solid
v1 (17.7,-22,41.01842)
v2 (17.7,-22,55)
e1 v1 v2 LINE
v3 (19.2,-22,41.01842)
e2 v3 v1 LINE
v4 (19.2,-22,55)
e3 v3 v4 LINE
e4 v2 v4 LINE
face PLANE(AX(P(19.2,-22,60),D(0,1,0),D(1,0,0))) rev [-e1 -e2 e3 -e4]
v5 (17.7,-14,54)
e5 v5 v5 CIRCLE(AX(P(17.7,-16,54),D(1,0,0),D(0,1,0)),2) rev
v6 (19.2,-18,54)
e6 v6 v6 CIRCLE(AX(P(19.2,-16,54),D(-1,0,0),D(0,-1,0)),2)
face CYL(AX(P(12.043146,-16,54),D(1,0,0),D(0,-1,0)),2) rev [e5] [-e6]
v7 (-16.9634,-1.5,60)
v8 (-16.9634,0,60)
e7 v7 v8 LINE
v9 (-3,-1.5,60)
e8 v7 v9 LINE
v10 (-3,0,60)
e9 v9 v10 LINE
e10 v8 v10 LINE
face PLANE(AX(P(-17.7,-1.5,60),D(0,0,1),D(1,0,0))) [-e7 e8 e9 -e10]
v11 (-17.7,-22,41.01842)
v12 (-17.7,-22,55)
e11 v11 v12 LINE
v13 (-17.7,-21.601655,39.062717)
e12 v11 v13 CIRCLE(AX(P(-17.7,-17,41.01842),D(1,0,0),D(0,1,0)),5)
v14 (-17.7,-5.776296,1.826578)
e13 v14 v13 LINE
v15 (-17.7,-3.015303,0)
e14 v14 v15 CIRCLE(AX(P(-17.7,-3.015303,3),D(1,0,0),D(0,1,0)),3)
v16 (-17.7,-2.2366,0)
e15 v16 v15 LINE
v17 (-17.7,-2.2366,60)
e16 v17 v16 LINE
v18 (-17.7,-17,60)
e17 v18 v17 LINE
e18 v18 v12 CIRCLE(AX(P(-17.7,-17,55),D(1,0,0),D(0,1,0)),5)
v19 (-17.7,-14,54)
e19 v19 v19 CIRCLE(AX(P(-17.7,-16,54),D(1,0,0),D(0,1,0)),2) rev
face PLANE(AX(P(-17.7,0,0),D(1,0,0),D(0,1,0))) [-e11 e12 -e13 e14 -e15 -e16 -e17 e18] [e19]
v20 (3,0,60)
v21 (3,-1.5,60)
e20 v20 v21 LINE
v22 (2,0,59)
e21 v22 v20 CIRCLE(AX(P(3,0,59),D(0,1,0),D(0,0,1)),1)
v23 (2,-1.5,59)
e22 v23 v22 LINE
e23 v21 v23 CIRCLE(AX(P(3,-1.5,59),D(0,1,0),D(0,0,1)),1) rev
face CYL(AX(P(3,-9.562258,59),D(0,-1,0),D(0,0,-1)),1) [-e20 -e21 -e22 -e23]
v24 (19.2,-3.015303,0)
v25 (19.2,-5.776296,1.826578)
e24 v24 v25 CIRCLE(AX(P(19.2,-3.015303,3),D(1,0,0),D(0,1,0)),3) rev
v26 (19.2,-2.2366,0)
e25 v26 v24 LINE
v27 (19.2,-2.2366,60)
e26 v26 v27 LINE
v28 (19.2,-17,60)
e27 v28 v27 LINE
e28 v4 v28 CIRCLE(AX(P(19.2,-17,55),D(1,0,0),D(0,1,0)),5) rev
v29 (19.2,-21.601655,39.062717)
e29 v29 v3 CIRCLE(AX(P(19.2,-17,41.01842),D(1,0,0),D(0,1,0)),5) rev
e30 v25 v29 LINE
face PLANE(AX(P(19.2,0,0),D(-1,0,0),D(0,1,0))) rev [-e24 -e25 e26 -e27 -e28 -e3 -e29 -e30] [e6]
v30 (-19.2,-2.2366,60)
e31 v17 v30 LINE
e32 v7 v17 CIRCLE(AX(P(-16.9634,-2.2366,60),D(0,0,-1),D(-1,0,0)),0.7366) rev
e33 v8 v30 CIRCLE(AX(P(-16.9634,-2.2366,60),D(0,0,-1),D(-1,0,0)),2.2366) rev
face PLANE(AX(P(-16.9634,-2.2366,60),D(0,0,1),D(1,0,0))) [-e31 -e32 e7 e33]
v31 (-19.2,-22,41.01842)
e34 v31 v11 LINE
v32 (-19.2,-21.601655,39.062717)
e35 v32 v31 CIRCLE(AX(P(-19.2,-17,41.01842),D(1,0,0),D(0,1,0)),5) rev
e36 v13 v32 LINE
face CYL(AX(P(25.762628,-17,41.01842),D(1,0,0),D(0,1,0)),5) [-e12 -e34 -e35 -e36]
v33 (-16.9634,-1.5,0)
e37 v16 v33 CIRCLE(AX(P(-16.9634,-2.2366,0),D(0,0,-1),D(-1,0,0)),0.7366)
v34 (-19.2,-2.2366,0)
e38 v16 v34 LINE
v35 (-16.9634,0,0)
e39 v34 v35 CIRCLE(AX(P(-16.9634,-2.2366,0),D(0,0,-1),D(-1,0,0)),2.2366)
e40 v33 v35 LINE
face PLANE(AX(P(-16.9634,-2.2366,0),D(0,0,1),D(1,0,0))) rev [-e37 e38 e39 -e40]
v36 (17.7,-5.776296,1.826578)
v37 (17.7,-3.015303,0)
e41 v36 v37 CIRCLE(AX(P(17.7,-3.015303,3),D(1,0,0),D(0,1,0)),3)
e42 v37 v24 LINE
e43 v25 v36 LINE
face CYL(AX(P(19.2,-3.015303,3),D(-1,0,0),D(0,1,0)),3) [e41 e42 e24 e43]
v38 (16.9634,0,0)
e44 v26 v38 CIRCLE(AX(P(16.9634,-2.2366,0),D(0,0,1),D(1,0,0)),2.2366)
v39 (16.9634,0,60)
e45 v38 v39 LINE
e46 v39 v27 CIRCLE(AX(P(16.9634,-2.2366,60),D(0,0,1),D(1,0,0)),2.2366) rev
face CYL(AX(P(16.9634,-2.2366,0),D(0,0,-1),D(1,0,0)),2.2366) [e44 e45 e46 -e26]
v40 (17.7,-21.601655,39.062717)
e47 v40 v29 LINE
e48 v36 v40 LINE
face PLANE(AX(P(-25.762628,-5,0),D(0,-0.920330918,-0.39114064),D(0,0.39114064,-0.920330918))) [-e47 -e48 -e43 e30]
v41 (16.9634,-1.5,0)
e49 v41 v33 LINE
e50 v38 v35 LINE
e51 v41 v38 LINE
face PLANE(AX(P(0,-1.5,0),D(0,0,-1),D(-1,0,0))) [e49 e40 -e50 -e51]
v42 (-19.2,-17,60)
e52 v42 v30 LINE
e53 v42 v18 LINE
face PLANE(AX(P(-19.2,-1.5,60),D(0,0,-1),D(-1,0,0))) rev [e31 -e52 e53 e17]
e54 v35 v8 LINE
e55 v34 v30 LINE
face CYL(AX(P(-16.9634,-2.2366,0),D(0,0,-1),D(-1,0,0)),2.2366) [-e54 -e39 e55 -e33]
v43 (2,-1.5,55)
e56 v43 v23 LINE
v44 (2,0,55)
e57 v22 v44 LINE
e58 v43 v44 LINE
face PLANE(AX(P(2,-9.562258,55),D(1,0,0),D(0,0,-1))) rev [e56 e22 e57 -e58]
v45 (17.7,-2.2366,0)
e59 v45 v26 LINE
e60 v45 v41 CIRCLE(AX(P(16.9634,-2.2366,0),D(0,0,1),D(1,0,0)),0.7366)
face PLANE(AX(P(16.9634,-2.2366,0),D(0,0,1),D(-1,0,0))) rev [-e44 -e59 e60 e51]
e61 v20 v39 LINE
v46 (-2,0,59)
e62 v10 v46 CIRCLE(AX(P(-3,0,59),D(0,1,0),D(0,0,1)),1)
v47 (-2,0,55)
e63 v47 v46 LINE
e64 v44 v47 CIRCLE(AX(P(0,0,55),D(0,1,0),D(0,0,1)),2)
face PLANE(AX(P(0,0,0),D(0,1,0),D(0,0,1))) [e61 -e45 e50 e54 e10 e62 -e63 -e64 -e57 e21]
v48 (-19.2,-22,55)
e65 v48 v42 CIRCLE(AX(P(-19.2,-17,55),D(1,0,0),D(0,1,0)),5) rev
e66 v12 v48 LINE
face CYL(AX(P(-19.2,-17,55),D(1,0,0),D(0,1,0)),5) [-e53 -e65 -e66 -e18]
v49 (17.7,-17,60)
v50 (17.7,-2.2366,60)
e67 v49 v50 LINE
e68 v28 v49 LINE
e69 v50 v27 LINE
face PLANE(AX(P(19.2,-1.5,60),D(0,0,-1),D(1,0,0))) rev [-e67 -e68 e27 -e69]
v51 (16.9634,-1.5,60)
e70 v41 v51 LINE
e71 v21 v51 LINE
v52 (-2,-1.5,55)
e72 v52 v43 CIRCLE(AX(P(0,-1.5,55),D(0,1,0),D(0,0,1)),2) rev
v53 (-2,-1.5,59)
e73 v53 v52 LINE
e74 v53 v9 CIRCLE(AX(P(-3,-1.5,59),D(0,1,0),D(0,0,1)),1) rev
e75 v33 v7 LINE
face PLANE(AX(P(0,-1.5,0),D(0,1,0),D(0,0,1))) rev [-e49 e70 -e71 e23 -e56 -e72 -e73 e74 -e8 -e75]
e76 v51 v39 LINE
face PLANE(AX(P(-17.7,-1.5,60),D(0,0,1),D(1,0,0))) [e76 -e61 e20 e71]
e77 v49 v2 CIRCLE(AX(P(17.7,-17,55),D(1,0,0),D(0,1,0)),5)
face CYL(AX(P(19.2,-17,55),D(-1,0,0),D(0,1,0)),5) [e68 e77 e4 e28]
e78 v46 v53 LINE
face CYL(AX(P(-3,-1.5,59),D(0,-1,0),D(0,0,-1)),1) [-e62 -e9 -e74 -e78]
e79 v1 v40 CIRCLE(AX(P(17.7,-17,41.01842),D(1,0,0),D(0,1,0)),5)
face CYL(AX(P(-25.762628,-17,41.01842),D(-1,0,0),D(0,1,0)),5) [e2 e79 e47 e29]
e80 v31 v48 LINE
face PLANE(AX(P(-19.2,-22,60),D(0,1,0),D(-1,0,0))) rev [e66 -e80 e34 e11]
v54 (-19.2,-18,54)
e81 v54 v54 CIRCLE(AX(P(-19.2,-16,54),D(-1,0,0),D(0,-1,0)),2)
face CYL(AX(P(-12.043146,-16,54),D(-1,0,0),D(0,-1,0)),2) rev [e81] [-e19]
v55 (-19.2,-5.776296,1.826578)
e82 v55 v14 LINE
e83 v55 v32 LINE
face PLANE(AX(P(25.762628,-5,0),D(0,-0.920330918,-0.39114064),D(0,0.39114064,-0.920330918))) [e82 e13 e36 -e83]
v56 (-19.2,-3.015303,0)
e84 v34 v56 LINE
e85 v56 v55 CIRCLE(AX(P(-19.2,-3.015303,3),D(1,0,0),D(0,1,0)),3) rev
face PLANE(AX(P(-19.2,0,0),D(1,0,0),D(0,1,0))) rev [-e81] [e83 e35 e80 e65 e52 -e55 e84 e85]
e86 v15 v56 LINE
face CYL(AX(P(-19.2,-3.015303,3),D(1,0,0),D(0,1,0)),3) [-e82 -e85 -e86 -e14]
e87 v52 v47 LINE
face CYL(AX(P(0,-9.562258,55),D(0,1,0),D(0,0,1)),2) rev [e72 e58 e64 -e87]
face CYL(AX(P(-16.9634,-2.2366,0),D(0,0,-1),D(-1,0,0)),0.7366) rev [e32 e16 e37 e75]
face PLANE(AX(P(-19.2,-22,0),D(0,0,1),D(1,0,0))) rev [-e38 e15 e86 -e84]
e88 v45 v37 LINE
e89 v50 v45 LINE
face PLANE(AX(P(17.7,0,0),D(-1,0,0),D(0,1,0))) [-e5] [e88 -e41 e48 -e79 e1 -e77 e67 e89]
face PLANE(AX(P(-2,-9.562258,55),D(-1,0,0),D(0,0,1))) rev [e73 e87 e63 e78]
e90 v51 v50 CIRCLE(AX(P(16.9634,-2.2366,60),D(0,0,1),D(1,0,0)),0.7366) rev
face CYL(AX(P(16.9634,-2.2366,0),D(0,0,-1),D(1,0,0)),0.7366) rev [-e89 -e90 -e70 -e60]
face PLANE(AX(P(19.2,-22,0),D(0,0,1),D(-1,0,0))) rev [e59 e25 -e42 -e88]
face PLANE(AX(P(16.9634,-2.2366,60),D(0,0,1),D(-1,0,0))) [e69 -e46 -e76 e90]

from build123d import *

# Parameters (mm, degrees)
SKETCH1_W                    = 17.7
SKETCH1_H                    = 60
BASE_FLANGE2_DEPTH           = 1.5
EDGE_FLANGE2_STRIP_W         = 7.4732
EDGE_FLANGE2_STRIP_H         = 1.5
EDGE_FLANGE2_STRIP_CUT_DEPTH = 60
EDGE_FLANGE2_DEPTH           = 60
CUT_EXTRUDE5_DEPTH           = 1.5
FILLET4_R                    = 5
FILLET5_R                    = 3
SKETCH22_R                   = 2
CUT_EXTRUDE6_DEPTH           = 1.5
CUT_EXTRUDE7_REACH           = 68.728
FILLET6_R                    = 1


# Sheet-metal steps are written as plain solids
with BuildPart() as part:
    # Sketch1 → Base-Flange2 (new body)
    with BuildSketch(Plane(origin=(0, 0, 0), x_dir=(1, 0, 0), z_dir=(0, 1, 0))):
        with Locations((-8.85, -30)):
            Rectangle(SKETCH1_W, SKETCH1_H)
    extrude(amount=-BASE_FLANGE2_DEPTH)

    # Edge-Flange2 strip (across the edge) → Edge-Flange2 strip cut (cut)
    with BuildSketch(Plane(origin=(-17.7, -1.5, 60), x_dir=(1, 0, 0), z_dir=(0, 0, -1))):
        with Locations((-3, -0.75)):
            Rectangle(EDGE_FLANGE2_STRIP_W, EDGE_FLANGE2_STRIP_H)
    extrude(amount=EDGE_FLANGE2_STRIP_CUT_DEPTH, mode=Mode.SUBTRACT)

    # Edge-Flange2 section (across the edge) → Edge-Flange2 (add)
    with BuildSketch(Plane(origin=(-17.7, -1.5, 60), x_dir=(1, 0, 0), z_dir=(0, 0, -1))):
        with BuildLine():
            Line((-1.5, 0.7366), (-1.5, 20.5))
            Line((-1.5, 20.5), (0, 20.5))
            Line((0, 20.5), (0, 0.7366))
            ThreePointArc((0, 0.7366), (0.215745145, 0.215745145), (0.7366, 0))
            Line((0.7366, 0), (0.7366, -1.5))
            ThreePointArc((0.7366, -1.5), (-0.844915027, -0.844915027), (-1.5, 0.7366))
        make_face()
    extrude(amount=EDGE_FLANGE2_DEPTH)

    # Sketch20 → Cut-Extrude5 (cut)
    with BuildSketch(Plane.ZY.offset(19.2)):
        Polygon((0, -5), (40, -22), (0, -22), align=None)
    extrude(amount=-CUT_EXTRUDE5_DEPTH, mode=Mode.SUBTRACT)

    # Fillet4
    fillet4_edges = [part.edges().sort_by_distance(p)[0] for p in [
        (-18.45, -22, 60),
        (-18.45, -22, 40),
    ]]
    fillet(fillet4_edges, radius=FILLET4_R)

    # Fillet5
    fillet5_edges = [part.edges().sort_by_distance(p)[0] for p in [
        (-18.45, -5, 0),
    ]]
    fillet(fillet5_edges, radius=FILLET5_R)

    # Sketch22 → Cut-Extrude6 (cut)
    with BuildSketch(Plane.ZY.offset(19.2)):
        with Locations(Location((54, -16, 0), (0, 0, 270))):
            Circle(SKETCH22_R)
    extrude(amount=-CUT_EXTRUDE6_DEPTH, mode=Mode.SUBTRACT)

    # Mirror1: part across plane


with BuildPart() as part_1:
    add(part.part)
    add(part.part.mirror(Plane(origin=(0, -1.5, 60), x_dir=(0, 0, 1), z_dir=(1, 0, 0))))

    # Sketch28 → Cut-Extrude7 (cut, up to next)
    with BuildSketch(Plane(origin=(0, 0, 0), x_dir=(1, 0, 0), z_dir=(0, 1, 0)), mode=Mode.PRIVATE) as cut_extrude7_sk1:
        with BuildLine():
            Line((2, -55), (2, -60))
            Line((2, -60), (-2, -60))
            Line((-2, -60), (-2, -55))
            ThreePointArc((-2, -55), (0, -53), (2, -55))
        make_face()
    cut_extrude7_tool1 = extrude(cut_extrude7_sk1.sketch, amount=-CUT_EXTRUDE7_REACH, mode=Mode.PRIVATE) & part_1.part
    add(cut_extrude7_tool1.solids().sort_by_distance((0, 0, 56.699439))[0], mode=Mode.SUBTRACT)

    # Fillet6
    fillet6_edges = [part_1.edges().sort_by_distance(p)[0] for p in [
        (2, -0.75, 60),
        (-2, -0.75, 60),
    ]]
    fillet(fillet6_edges, radius=FILLET6_R)


solid = part_1.part
